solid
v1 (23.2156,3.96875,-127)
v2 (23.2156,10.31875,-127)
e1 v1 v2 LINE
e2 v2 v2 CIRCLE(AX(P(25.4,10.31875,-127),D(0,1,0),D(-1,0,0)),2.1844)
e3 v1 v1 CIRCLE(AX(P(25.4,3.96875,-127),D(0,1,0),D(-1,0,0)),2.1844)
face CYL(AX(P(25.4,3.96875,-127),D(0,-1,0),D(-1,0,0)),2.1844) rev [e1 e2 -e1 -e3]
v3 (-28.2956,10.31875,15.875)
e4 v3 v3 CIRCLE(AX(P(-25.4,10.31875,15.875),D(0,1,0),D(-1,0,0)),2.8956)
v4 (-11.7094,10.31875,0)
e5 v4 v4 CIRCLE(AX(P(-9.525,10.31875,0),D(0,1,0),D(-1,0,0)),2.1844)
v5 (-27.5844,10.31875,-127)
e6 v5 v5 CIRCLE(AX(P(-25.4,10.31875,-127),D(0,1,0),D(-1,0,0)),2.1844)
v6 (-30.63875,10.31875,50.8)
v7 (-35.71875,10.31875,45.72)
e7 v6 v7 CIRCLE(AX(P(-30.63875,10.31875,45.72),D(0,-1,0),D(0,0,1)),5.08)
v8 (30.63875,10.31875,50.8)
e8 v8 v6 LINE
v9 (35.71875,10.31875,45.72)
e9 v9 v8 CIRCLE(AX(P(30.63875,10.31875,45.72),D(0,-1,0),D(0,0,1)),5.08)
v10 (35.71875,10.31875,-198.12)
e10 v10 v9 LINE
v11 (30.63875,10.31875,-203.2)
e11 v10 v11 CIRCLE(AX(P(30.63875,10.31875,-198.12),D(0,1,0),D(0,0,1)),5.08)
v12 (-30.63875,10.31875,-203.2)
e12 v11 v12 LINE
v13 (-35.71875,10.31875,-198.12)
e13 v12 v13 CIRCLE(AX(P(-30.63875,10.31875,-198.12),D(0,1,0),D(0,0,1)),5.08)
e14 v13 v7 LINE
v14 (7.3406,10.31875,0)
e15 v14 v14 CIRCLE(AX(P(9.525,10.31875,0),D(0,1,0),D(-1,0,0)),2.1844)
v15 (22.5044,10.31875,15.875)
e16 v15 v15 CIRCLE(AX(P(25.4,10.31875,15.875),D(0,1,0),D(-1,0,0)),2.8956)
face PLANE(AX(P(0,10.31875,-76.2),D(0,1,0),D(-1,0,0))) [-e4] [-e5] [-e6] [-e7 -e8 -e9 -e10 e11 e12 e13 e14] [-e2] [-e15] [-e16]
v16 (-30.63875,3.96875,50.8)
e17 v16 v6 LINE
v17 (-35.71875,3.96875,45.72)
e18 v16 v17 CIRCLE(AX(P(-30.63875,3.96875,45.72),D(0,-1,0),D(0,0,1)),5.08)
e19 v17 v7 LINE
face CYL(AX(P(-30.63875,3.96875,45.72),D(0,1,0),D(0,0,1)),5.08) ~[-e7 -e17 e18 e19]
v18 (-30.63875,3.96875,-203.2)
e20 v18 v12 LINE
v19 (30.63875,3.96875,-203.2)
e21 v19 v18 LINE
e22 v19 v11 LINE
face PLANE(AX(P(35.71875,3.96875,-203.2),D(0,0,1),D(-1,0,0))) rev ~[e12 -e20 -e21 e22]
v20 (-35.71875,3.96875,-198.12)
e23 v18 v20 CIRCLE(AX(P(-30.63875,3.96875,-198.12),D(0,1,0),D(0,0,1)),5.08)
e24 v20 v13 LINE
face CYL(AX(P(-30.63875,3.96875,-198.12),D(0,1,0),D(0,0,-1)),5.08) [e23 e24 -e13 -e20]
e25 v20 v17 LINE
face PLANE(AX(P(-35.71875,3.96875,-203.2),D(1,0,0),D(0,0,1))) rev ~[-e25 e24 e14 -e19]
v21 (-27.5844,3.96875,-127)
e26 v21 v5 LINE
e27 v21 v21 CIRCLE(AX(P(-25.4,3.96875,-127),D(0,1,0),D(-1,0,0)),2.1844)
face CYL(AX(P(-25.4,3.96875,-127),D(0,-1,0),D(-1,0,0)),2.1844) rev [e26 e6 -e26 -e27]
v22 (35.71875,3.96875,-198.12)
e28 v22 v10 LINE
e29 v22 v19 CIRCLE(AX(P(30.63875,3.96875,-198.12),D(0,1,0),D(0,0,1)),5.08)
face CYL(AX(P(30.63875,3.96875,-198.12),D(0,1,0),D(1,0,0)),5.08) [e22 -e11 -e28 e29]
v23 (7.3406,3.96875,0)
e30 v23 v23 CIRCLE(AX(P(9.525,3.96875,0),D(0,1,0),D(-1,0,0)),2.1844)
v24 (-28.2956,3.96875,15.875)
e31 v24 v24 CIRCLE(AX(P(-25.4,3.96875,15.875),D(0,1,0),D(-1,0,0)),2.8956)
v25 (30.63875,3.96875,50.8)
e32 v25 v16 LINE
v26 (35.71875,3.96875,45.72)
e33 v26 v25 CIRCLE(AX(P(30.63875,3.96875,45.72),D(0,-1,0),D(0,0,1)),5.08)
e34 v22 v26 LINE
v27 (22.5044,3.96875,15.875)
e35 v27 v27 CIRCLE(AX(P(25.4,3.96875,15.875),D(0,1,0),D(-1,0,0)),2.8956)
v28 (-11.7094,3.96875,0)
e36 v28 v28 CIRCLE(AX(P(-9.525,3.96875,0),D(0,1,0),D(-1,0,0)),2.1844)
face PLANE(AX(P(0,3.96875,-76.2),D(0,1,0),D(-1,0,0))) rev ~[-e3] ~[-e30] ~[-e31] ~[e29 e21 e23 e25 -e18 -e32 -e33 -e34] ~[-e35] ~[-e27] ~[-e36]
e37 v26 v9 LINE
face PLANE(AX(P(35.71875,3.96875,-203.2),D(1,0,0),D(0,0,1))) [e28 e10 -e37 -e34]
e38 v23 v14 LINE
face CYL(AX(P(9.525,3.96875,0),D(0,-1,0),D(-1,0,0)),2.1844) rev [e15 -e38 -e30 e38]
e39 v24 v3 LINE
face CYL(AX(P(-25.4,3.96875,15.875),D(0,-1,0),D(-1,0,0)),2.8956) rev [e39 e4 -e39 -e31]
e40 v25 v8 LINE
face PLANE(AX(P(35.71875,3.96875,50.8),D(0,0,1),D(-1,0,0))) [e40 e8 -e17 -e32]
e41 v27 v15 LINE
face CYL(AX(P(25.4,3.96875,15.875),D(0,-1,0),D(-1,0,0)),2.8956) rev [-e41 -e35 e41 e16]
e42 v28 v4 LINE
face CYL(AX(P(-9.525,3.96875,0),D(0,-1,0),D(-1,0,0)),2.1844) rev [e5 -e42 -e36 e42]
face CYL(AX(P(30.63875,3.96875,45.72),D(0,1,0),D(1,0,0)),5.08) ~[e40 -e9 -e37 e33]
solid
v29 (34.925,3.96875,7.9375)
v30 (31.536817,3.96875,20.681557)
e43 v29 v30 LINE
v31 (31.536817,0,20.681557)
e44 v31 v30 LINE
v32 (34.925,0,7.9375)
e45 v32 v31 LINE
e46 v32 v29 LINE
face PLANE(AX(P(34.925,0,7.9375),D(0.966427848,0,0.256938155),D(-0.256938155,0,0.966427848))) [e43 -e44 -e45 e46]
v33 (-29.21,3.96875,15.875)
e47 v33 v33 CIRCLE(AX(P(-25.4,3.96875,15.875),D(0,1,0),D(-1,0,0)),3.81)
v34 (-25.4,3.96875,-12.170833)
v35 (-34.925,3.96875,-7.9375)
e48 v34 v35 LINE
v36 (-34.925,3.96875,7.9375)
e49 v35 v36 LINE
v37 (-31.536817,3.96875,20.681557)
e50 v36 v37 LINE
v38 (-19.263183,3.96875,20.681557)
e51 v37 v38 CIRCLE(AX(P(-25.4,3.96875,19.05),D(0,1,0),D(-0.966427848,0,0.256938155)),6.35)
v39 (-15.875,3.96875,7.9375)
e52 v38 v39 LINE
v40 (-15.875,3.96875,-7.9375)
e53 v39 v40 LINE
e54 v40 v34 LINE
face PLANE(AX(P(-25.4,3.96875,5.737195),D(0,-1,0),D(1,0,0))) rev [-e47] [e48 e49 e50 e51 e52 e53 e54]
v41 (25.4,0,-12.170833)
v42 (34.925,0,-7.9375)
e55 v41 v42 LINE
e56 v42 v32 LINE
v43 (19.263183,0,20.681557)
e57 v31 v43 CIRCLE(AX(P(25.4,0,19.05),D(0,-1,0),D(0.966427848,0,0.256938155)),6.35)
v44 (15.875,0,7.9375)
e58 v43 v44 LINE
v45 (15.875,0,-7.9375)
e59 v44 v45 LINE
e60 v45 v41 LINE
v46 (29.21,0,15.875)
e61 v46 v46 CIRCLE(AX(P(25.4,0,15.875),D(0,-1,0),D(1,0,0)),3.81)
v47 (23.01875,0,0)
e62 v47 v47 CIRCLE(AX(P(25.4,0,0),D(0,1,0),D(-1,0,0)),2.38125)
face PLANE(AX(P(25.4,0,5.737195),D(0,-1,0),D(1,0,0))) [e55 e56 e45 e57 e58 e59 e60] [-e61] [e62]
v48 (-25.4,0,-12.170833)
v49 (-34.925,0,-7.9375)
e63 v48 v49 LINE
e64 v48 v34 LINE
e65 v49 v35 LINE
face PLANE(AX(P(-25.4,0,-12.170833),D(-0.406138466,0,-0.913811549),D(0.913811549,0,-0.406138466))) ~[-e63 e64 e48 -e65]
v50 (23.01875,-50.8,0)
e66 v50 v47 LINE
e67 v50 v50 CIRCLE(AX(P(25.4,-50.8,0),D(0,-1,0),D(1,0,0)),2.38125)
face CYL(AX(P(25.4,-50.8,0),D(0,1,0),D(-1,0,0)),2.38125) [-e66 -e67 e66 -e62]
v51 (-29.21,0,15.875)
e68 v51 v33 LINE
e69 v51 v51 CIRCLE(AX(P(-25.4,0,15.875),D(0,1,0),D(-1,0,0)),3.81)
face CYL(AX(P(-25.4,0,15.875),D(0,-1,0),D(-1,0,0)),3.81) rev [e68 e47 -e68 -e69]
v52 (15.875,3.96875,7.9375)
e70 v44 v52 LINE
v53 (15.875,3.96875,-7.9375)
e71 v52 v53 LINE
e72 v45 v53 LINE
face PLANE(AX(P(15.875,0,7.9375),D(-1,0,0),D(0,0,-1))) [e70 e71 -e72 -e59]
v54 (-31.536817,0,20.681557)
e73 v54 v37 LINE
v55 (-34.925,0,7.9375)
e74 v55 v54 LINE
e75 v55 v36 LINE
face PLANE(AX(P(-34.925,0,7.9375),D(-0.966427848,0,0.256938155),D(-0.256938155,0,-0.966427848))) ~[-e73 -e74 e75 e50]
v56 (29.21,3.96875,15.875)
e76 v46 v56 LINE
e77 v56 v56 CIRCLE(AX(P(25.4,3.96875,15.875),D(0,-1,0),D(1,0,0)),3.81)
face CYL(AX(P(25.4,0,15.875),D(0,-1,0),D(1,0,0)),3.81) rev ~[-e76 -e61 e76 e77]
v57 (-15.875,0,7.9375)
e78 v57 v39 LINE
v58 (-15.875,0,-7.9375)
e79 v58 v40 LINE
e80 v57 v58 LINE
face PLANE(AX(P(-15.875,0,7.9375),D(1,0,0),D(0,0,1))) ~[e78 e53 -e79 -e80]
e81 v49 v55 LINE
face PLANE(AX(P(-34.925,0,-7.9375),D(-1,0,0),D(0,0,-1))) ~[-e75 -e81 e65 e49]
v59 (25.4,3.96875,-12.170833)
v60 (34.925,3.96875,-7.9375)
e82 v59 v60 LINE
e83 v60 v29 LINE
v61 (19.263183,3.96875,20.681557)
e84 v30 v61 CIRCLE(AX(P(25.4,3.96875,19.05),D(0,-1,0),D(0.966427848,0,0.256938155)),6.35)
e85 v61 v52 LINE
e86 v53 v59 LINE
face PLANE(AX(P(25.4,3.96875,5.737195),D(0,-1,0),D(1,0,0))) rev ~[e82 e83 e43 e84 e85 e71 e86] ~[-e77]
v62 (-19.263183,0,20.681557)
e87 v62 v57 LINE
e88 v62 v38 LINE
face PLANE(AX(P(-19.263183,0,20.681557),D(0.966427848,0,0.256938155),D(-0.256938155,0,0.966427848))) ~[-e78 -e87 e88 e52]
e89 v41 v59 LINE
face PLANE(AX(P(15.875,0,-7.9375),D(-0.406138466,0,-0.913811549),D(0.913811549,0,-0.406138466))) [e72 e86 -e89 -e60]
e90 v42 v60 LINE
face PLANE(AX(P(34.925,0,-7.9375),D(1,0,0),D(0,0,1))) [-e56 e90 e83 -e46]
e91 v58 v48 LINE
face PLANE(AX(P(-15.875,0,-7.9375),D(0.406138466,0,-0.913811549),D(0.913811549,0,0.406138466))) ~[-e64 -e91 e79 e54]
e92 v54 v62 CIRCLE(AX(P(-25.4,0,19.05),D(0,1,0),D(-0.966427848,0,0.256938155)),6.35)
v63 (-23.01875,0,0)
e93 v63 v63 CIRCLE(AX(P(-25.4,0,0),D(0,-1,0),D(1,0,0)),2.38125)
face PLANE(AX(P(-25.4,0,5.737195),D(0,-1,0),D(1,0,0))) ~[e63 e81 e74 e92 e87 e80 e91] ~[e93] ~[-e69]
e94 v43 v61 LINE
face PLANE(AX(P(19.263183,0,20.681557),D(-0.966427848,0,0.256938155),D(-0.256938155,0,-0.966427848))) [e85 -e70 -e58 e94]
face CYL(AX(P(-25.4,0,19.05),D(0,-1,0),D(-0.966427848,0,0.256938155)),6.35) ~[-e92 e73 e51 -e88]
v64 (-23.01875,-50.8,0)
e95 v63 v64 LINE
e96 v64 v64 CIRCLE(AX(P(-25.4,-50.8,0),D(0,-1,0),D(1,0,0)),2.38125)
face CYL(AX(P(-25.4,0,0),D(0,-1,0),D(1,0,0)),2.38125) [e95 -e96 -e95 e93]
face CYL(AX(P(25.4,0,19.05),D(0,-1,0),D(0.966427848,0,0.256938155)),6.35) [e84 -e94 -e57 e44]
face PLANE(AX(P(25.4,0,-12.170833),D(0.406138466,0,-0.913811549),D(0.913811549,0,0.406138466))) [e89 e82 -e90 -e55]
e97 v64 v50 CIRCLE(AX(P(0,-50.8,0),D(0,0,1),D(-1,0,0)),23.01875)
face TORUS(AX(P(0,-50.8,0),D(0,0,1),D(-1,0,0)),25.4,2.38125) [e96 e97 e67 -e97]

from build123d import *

# Parameters (mm, degrees)
F0_R     = 2.38125
F3_R     = 3.81
F4_DEPTH = 3.96875
F5_W     = 71.4375
F5_H     = 254
F5_R     = 2.1844
F5_R_2   = 2.8956
F6_DEPTH = 6.35
F7_R     = 5.08


# Not quite as in the source:
# - a pattern or mirror of a feature is missing from the dataset's text; its kind, count and spacing are read off the source's solid


with BuildPart() as f2:
    # F2: sweep along a path in F1
    with BuildLine(Plane.XY) as f2_path:
        Line((-25.4, 0), (-25.4, -50.8))
        ThreePointArc((-25.4, -50.8), (0, -76.2), (25.4, -50.8))
        Line((25.4, -50.8), (25.4, 0))
    # F0 (on Front) → F2 (sweep)
    with BuildSketch(Plane.XZ):
        with Locations((-25.4, 0)):
            Circle(F0_R)
    sweep(path=f2_path.line)

    # F3 (on Front) → F4 (join)
    with BuildSketch(Plane.XZ):
        with BuildLine():
            Line((34.925, 7.9375), (31.5368168318, 20.6815572844))
            ThreePointArc((31.5368168318, 20.6815572844), (25.4, 25.4), (19.2631831682, 20.6815572844))
            Line((19.2631831682, 20.6815572844), (15.875, 7.9375))
            Line((15.875, 7.9375), (15.875, -7.9375))
            Line((15.875, -7.9375), (25.4, -12.1708333333))
            Line((25.4, -12.1708333333), (34.925, -7.9375))
            Line((34.925, -7.9375), (34.925, 7.9375))
        make_face()
        with Locations((25.4, 15.875)):
            Circle(F3_R, mode=Mode.SUBTRACT)
    f4 = extrude(amount=-F4_DEPTH)

    # F4_copies: F4 across plane
    add(f4.mirror(Plane(origin=(0, 0, 0), x_dir=(0, 0, -1), z_dir=(-1, 0, 0))))


with BuildPart() as f6:
    # F5 (on face) → F6 (new body)
    with BuildSketch(Plane(origin=(0, 3.96875, 0), x_dir=(-1, 0, 0), z_dir=(0, 1, 0))):
        with Locations((0, -76.2)):
            Rectangle(F5_W, F5_H)
        with Locations((-25.4, -127)):
            Circle(F5_R, mode=Mode.SUBTRACT)
        with Locations((25.4, -127)):
            Circle(F5_R, mode=Mode.SUBTRACT)
        with Locations((-25.4, 15.875)):
            Circle(F5_R_2, mode=Mode.SUBTRACT)
        with Locations((-9.525, 0)):
            Circle(F5_R, mode=Mode.SUBTRACT)
        with Locations((9.525, 0)):
            Circle(F5_R, mode=Mode.SUBTRACT)
        with Locations((25.4, 15.875)):
            Circle(F5_R_2, mode=Mode.SUBTRACT)
    extrude(amount=F6_DEPTH)

    # F7
    f7_edges = [f6.edges().sort_by_distance(p)[0] for p in [
        (-35.71875, 7.14375, 50.8),
        (35.71875, 7.14375, 50.8),
        (35.71875, 7.14375, -203.2),
        (-35.71875, 7.14375, -203.2),
    ]]
    fillet(f7_edges, radius=F7_R)


solid = Compound([f2.part, f6.part])
